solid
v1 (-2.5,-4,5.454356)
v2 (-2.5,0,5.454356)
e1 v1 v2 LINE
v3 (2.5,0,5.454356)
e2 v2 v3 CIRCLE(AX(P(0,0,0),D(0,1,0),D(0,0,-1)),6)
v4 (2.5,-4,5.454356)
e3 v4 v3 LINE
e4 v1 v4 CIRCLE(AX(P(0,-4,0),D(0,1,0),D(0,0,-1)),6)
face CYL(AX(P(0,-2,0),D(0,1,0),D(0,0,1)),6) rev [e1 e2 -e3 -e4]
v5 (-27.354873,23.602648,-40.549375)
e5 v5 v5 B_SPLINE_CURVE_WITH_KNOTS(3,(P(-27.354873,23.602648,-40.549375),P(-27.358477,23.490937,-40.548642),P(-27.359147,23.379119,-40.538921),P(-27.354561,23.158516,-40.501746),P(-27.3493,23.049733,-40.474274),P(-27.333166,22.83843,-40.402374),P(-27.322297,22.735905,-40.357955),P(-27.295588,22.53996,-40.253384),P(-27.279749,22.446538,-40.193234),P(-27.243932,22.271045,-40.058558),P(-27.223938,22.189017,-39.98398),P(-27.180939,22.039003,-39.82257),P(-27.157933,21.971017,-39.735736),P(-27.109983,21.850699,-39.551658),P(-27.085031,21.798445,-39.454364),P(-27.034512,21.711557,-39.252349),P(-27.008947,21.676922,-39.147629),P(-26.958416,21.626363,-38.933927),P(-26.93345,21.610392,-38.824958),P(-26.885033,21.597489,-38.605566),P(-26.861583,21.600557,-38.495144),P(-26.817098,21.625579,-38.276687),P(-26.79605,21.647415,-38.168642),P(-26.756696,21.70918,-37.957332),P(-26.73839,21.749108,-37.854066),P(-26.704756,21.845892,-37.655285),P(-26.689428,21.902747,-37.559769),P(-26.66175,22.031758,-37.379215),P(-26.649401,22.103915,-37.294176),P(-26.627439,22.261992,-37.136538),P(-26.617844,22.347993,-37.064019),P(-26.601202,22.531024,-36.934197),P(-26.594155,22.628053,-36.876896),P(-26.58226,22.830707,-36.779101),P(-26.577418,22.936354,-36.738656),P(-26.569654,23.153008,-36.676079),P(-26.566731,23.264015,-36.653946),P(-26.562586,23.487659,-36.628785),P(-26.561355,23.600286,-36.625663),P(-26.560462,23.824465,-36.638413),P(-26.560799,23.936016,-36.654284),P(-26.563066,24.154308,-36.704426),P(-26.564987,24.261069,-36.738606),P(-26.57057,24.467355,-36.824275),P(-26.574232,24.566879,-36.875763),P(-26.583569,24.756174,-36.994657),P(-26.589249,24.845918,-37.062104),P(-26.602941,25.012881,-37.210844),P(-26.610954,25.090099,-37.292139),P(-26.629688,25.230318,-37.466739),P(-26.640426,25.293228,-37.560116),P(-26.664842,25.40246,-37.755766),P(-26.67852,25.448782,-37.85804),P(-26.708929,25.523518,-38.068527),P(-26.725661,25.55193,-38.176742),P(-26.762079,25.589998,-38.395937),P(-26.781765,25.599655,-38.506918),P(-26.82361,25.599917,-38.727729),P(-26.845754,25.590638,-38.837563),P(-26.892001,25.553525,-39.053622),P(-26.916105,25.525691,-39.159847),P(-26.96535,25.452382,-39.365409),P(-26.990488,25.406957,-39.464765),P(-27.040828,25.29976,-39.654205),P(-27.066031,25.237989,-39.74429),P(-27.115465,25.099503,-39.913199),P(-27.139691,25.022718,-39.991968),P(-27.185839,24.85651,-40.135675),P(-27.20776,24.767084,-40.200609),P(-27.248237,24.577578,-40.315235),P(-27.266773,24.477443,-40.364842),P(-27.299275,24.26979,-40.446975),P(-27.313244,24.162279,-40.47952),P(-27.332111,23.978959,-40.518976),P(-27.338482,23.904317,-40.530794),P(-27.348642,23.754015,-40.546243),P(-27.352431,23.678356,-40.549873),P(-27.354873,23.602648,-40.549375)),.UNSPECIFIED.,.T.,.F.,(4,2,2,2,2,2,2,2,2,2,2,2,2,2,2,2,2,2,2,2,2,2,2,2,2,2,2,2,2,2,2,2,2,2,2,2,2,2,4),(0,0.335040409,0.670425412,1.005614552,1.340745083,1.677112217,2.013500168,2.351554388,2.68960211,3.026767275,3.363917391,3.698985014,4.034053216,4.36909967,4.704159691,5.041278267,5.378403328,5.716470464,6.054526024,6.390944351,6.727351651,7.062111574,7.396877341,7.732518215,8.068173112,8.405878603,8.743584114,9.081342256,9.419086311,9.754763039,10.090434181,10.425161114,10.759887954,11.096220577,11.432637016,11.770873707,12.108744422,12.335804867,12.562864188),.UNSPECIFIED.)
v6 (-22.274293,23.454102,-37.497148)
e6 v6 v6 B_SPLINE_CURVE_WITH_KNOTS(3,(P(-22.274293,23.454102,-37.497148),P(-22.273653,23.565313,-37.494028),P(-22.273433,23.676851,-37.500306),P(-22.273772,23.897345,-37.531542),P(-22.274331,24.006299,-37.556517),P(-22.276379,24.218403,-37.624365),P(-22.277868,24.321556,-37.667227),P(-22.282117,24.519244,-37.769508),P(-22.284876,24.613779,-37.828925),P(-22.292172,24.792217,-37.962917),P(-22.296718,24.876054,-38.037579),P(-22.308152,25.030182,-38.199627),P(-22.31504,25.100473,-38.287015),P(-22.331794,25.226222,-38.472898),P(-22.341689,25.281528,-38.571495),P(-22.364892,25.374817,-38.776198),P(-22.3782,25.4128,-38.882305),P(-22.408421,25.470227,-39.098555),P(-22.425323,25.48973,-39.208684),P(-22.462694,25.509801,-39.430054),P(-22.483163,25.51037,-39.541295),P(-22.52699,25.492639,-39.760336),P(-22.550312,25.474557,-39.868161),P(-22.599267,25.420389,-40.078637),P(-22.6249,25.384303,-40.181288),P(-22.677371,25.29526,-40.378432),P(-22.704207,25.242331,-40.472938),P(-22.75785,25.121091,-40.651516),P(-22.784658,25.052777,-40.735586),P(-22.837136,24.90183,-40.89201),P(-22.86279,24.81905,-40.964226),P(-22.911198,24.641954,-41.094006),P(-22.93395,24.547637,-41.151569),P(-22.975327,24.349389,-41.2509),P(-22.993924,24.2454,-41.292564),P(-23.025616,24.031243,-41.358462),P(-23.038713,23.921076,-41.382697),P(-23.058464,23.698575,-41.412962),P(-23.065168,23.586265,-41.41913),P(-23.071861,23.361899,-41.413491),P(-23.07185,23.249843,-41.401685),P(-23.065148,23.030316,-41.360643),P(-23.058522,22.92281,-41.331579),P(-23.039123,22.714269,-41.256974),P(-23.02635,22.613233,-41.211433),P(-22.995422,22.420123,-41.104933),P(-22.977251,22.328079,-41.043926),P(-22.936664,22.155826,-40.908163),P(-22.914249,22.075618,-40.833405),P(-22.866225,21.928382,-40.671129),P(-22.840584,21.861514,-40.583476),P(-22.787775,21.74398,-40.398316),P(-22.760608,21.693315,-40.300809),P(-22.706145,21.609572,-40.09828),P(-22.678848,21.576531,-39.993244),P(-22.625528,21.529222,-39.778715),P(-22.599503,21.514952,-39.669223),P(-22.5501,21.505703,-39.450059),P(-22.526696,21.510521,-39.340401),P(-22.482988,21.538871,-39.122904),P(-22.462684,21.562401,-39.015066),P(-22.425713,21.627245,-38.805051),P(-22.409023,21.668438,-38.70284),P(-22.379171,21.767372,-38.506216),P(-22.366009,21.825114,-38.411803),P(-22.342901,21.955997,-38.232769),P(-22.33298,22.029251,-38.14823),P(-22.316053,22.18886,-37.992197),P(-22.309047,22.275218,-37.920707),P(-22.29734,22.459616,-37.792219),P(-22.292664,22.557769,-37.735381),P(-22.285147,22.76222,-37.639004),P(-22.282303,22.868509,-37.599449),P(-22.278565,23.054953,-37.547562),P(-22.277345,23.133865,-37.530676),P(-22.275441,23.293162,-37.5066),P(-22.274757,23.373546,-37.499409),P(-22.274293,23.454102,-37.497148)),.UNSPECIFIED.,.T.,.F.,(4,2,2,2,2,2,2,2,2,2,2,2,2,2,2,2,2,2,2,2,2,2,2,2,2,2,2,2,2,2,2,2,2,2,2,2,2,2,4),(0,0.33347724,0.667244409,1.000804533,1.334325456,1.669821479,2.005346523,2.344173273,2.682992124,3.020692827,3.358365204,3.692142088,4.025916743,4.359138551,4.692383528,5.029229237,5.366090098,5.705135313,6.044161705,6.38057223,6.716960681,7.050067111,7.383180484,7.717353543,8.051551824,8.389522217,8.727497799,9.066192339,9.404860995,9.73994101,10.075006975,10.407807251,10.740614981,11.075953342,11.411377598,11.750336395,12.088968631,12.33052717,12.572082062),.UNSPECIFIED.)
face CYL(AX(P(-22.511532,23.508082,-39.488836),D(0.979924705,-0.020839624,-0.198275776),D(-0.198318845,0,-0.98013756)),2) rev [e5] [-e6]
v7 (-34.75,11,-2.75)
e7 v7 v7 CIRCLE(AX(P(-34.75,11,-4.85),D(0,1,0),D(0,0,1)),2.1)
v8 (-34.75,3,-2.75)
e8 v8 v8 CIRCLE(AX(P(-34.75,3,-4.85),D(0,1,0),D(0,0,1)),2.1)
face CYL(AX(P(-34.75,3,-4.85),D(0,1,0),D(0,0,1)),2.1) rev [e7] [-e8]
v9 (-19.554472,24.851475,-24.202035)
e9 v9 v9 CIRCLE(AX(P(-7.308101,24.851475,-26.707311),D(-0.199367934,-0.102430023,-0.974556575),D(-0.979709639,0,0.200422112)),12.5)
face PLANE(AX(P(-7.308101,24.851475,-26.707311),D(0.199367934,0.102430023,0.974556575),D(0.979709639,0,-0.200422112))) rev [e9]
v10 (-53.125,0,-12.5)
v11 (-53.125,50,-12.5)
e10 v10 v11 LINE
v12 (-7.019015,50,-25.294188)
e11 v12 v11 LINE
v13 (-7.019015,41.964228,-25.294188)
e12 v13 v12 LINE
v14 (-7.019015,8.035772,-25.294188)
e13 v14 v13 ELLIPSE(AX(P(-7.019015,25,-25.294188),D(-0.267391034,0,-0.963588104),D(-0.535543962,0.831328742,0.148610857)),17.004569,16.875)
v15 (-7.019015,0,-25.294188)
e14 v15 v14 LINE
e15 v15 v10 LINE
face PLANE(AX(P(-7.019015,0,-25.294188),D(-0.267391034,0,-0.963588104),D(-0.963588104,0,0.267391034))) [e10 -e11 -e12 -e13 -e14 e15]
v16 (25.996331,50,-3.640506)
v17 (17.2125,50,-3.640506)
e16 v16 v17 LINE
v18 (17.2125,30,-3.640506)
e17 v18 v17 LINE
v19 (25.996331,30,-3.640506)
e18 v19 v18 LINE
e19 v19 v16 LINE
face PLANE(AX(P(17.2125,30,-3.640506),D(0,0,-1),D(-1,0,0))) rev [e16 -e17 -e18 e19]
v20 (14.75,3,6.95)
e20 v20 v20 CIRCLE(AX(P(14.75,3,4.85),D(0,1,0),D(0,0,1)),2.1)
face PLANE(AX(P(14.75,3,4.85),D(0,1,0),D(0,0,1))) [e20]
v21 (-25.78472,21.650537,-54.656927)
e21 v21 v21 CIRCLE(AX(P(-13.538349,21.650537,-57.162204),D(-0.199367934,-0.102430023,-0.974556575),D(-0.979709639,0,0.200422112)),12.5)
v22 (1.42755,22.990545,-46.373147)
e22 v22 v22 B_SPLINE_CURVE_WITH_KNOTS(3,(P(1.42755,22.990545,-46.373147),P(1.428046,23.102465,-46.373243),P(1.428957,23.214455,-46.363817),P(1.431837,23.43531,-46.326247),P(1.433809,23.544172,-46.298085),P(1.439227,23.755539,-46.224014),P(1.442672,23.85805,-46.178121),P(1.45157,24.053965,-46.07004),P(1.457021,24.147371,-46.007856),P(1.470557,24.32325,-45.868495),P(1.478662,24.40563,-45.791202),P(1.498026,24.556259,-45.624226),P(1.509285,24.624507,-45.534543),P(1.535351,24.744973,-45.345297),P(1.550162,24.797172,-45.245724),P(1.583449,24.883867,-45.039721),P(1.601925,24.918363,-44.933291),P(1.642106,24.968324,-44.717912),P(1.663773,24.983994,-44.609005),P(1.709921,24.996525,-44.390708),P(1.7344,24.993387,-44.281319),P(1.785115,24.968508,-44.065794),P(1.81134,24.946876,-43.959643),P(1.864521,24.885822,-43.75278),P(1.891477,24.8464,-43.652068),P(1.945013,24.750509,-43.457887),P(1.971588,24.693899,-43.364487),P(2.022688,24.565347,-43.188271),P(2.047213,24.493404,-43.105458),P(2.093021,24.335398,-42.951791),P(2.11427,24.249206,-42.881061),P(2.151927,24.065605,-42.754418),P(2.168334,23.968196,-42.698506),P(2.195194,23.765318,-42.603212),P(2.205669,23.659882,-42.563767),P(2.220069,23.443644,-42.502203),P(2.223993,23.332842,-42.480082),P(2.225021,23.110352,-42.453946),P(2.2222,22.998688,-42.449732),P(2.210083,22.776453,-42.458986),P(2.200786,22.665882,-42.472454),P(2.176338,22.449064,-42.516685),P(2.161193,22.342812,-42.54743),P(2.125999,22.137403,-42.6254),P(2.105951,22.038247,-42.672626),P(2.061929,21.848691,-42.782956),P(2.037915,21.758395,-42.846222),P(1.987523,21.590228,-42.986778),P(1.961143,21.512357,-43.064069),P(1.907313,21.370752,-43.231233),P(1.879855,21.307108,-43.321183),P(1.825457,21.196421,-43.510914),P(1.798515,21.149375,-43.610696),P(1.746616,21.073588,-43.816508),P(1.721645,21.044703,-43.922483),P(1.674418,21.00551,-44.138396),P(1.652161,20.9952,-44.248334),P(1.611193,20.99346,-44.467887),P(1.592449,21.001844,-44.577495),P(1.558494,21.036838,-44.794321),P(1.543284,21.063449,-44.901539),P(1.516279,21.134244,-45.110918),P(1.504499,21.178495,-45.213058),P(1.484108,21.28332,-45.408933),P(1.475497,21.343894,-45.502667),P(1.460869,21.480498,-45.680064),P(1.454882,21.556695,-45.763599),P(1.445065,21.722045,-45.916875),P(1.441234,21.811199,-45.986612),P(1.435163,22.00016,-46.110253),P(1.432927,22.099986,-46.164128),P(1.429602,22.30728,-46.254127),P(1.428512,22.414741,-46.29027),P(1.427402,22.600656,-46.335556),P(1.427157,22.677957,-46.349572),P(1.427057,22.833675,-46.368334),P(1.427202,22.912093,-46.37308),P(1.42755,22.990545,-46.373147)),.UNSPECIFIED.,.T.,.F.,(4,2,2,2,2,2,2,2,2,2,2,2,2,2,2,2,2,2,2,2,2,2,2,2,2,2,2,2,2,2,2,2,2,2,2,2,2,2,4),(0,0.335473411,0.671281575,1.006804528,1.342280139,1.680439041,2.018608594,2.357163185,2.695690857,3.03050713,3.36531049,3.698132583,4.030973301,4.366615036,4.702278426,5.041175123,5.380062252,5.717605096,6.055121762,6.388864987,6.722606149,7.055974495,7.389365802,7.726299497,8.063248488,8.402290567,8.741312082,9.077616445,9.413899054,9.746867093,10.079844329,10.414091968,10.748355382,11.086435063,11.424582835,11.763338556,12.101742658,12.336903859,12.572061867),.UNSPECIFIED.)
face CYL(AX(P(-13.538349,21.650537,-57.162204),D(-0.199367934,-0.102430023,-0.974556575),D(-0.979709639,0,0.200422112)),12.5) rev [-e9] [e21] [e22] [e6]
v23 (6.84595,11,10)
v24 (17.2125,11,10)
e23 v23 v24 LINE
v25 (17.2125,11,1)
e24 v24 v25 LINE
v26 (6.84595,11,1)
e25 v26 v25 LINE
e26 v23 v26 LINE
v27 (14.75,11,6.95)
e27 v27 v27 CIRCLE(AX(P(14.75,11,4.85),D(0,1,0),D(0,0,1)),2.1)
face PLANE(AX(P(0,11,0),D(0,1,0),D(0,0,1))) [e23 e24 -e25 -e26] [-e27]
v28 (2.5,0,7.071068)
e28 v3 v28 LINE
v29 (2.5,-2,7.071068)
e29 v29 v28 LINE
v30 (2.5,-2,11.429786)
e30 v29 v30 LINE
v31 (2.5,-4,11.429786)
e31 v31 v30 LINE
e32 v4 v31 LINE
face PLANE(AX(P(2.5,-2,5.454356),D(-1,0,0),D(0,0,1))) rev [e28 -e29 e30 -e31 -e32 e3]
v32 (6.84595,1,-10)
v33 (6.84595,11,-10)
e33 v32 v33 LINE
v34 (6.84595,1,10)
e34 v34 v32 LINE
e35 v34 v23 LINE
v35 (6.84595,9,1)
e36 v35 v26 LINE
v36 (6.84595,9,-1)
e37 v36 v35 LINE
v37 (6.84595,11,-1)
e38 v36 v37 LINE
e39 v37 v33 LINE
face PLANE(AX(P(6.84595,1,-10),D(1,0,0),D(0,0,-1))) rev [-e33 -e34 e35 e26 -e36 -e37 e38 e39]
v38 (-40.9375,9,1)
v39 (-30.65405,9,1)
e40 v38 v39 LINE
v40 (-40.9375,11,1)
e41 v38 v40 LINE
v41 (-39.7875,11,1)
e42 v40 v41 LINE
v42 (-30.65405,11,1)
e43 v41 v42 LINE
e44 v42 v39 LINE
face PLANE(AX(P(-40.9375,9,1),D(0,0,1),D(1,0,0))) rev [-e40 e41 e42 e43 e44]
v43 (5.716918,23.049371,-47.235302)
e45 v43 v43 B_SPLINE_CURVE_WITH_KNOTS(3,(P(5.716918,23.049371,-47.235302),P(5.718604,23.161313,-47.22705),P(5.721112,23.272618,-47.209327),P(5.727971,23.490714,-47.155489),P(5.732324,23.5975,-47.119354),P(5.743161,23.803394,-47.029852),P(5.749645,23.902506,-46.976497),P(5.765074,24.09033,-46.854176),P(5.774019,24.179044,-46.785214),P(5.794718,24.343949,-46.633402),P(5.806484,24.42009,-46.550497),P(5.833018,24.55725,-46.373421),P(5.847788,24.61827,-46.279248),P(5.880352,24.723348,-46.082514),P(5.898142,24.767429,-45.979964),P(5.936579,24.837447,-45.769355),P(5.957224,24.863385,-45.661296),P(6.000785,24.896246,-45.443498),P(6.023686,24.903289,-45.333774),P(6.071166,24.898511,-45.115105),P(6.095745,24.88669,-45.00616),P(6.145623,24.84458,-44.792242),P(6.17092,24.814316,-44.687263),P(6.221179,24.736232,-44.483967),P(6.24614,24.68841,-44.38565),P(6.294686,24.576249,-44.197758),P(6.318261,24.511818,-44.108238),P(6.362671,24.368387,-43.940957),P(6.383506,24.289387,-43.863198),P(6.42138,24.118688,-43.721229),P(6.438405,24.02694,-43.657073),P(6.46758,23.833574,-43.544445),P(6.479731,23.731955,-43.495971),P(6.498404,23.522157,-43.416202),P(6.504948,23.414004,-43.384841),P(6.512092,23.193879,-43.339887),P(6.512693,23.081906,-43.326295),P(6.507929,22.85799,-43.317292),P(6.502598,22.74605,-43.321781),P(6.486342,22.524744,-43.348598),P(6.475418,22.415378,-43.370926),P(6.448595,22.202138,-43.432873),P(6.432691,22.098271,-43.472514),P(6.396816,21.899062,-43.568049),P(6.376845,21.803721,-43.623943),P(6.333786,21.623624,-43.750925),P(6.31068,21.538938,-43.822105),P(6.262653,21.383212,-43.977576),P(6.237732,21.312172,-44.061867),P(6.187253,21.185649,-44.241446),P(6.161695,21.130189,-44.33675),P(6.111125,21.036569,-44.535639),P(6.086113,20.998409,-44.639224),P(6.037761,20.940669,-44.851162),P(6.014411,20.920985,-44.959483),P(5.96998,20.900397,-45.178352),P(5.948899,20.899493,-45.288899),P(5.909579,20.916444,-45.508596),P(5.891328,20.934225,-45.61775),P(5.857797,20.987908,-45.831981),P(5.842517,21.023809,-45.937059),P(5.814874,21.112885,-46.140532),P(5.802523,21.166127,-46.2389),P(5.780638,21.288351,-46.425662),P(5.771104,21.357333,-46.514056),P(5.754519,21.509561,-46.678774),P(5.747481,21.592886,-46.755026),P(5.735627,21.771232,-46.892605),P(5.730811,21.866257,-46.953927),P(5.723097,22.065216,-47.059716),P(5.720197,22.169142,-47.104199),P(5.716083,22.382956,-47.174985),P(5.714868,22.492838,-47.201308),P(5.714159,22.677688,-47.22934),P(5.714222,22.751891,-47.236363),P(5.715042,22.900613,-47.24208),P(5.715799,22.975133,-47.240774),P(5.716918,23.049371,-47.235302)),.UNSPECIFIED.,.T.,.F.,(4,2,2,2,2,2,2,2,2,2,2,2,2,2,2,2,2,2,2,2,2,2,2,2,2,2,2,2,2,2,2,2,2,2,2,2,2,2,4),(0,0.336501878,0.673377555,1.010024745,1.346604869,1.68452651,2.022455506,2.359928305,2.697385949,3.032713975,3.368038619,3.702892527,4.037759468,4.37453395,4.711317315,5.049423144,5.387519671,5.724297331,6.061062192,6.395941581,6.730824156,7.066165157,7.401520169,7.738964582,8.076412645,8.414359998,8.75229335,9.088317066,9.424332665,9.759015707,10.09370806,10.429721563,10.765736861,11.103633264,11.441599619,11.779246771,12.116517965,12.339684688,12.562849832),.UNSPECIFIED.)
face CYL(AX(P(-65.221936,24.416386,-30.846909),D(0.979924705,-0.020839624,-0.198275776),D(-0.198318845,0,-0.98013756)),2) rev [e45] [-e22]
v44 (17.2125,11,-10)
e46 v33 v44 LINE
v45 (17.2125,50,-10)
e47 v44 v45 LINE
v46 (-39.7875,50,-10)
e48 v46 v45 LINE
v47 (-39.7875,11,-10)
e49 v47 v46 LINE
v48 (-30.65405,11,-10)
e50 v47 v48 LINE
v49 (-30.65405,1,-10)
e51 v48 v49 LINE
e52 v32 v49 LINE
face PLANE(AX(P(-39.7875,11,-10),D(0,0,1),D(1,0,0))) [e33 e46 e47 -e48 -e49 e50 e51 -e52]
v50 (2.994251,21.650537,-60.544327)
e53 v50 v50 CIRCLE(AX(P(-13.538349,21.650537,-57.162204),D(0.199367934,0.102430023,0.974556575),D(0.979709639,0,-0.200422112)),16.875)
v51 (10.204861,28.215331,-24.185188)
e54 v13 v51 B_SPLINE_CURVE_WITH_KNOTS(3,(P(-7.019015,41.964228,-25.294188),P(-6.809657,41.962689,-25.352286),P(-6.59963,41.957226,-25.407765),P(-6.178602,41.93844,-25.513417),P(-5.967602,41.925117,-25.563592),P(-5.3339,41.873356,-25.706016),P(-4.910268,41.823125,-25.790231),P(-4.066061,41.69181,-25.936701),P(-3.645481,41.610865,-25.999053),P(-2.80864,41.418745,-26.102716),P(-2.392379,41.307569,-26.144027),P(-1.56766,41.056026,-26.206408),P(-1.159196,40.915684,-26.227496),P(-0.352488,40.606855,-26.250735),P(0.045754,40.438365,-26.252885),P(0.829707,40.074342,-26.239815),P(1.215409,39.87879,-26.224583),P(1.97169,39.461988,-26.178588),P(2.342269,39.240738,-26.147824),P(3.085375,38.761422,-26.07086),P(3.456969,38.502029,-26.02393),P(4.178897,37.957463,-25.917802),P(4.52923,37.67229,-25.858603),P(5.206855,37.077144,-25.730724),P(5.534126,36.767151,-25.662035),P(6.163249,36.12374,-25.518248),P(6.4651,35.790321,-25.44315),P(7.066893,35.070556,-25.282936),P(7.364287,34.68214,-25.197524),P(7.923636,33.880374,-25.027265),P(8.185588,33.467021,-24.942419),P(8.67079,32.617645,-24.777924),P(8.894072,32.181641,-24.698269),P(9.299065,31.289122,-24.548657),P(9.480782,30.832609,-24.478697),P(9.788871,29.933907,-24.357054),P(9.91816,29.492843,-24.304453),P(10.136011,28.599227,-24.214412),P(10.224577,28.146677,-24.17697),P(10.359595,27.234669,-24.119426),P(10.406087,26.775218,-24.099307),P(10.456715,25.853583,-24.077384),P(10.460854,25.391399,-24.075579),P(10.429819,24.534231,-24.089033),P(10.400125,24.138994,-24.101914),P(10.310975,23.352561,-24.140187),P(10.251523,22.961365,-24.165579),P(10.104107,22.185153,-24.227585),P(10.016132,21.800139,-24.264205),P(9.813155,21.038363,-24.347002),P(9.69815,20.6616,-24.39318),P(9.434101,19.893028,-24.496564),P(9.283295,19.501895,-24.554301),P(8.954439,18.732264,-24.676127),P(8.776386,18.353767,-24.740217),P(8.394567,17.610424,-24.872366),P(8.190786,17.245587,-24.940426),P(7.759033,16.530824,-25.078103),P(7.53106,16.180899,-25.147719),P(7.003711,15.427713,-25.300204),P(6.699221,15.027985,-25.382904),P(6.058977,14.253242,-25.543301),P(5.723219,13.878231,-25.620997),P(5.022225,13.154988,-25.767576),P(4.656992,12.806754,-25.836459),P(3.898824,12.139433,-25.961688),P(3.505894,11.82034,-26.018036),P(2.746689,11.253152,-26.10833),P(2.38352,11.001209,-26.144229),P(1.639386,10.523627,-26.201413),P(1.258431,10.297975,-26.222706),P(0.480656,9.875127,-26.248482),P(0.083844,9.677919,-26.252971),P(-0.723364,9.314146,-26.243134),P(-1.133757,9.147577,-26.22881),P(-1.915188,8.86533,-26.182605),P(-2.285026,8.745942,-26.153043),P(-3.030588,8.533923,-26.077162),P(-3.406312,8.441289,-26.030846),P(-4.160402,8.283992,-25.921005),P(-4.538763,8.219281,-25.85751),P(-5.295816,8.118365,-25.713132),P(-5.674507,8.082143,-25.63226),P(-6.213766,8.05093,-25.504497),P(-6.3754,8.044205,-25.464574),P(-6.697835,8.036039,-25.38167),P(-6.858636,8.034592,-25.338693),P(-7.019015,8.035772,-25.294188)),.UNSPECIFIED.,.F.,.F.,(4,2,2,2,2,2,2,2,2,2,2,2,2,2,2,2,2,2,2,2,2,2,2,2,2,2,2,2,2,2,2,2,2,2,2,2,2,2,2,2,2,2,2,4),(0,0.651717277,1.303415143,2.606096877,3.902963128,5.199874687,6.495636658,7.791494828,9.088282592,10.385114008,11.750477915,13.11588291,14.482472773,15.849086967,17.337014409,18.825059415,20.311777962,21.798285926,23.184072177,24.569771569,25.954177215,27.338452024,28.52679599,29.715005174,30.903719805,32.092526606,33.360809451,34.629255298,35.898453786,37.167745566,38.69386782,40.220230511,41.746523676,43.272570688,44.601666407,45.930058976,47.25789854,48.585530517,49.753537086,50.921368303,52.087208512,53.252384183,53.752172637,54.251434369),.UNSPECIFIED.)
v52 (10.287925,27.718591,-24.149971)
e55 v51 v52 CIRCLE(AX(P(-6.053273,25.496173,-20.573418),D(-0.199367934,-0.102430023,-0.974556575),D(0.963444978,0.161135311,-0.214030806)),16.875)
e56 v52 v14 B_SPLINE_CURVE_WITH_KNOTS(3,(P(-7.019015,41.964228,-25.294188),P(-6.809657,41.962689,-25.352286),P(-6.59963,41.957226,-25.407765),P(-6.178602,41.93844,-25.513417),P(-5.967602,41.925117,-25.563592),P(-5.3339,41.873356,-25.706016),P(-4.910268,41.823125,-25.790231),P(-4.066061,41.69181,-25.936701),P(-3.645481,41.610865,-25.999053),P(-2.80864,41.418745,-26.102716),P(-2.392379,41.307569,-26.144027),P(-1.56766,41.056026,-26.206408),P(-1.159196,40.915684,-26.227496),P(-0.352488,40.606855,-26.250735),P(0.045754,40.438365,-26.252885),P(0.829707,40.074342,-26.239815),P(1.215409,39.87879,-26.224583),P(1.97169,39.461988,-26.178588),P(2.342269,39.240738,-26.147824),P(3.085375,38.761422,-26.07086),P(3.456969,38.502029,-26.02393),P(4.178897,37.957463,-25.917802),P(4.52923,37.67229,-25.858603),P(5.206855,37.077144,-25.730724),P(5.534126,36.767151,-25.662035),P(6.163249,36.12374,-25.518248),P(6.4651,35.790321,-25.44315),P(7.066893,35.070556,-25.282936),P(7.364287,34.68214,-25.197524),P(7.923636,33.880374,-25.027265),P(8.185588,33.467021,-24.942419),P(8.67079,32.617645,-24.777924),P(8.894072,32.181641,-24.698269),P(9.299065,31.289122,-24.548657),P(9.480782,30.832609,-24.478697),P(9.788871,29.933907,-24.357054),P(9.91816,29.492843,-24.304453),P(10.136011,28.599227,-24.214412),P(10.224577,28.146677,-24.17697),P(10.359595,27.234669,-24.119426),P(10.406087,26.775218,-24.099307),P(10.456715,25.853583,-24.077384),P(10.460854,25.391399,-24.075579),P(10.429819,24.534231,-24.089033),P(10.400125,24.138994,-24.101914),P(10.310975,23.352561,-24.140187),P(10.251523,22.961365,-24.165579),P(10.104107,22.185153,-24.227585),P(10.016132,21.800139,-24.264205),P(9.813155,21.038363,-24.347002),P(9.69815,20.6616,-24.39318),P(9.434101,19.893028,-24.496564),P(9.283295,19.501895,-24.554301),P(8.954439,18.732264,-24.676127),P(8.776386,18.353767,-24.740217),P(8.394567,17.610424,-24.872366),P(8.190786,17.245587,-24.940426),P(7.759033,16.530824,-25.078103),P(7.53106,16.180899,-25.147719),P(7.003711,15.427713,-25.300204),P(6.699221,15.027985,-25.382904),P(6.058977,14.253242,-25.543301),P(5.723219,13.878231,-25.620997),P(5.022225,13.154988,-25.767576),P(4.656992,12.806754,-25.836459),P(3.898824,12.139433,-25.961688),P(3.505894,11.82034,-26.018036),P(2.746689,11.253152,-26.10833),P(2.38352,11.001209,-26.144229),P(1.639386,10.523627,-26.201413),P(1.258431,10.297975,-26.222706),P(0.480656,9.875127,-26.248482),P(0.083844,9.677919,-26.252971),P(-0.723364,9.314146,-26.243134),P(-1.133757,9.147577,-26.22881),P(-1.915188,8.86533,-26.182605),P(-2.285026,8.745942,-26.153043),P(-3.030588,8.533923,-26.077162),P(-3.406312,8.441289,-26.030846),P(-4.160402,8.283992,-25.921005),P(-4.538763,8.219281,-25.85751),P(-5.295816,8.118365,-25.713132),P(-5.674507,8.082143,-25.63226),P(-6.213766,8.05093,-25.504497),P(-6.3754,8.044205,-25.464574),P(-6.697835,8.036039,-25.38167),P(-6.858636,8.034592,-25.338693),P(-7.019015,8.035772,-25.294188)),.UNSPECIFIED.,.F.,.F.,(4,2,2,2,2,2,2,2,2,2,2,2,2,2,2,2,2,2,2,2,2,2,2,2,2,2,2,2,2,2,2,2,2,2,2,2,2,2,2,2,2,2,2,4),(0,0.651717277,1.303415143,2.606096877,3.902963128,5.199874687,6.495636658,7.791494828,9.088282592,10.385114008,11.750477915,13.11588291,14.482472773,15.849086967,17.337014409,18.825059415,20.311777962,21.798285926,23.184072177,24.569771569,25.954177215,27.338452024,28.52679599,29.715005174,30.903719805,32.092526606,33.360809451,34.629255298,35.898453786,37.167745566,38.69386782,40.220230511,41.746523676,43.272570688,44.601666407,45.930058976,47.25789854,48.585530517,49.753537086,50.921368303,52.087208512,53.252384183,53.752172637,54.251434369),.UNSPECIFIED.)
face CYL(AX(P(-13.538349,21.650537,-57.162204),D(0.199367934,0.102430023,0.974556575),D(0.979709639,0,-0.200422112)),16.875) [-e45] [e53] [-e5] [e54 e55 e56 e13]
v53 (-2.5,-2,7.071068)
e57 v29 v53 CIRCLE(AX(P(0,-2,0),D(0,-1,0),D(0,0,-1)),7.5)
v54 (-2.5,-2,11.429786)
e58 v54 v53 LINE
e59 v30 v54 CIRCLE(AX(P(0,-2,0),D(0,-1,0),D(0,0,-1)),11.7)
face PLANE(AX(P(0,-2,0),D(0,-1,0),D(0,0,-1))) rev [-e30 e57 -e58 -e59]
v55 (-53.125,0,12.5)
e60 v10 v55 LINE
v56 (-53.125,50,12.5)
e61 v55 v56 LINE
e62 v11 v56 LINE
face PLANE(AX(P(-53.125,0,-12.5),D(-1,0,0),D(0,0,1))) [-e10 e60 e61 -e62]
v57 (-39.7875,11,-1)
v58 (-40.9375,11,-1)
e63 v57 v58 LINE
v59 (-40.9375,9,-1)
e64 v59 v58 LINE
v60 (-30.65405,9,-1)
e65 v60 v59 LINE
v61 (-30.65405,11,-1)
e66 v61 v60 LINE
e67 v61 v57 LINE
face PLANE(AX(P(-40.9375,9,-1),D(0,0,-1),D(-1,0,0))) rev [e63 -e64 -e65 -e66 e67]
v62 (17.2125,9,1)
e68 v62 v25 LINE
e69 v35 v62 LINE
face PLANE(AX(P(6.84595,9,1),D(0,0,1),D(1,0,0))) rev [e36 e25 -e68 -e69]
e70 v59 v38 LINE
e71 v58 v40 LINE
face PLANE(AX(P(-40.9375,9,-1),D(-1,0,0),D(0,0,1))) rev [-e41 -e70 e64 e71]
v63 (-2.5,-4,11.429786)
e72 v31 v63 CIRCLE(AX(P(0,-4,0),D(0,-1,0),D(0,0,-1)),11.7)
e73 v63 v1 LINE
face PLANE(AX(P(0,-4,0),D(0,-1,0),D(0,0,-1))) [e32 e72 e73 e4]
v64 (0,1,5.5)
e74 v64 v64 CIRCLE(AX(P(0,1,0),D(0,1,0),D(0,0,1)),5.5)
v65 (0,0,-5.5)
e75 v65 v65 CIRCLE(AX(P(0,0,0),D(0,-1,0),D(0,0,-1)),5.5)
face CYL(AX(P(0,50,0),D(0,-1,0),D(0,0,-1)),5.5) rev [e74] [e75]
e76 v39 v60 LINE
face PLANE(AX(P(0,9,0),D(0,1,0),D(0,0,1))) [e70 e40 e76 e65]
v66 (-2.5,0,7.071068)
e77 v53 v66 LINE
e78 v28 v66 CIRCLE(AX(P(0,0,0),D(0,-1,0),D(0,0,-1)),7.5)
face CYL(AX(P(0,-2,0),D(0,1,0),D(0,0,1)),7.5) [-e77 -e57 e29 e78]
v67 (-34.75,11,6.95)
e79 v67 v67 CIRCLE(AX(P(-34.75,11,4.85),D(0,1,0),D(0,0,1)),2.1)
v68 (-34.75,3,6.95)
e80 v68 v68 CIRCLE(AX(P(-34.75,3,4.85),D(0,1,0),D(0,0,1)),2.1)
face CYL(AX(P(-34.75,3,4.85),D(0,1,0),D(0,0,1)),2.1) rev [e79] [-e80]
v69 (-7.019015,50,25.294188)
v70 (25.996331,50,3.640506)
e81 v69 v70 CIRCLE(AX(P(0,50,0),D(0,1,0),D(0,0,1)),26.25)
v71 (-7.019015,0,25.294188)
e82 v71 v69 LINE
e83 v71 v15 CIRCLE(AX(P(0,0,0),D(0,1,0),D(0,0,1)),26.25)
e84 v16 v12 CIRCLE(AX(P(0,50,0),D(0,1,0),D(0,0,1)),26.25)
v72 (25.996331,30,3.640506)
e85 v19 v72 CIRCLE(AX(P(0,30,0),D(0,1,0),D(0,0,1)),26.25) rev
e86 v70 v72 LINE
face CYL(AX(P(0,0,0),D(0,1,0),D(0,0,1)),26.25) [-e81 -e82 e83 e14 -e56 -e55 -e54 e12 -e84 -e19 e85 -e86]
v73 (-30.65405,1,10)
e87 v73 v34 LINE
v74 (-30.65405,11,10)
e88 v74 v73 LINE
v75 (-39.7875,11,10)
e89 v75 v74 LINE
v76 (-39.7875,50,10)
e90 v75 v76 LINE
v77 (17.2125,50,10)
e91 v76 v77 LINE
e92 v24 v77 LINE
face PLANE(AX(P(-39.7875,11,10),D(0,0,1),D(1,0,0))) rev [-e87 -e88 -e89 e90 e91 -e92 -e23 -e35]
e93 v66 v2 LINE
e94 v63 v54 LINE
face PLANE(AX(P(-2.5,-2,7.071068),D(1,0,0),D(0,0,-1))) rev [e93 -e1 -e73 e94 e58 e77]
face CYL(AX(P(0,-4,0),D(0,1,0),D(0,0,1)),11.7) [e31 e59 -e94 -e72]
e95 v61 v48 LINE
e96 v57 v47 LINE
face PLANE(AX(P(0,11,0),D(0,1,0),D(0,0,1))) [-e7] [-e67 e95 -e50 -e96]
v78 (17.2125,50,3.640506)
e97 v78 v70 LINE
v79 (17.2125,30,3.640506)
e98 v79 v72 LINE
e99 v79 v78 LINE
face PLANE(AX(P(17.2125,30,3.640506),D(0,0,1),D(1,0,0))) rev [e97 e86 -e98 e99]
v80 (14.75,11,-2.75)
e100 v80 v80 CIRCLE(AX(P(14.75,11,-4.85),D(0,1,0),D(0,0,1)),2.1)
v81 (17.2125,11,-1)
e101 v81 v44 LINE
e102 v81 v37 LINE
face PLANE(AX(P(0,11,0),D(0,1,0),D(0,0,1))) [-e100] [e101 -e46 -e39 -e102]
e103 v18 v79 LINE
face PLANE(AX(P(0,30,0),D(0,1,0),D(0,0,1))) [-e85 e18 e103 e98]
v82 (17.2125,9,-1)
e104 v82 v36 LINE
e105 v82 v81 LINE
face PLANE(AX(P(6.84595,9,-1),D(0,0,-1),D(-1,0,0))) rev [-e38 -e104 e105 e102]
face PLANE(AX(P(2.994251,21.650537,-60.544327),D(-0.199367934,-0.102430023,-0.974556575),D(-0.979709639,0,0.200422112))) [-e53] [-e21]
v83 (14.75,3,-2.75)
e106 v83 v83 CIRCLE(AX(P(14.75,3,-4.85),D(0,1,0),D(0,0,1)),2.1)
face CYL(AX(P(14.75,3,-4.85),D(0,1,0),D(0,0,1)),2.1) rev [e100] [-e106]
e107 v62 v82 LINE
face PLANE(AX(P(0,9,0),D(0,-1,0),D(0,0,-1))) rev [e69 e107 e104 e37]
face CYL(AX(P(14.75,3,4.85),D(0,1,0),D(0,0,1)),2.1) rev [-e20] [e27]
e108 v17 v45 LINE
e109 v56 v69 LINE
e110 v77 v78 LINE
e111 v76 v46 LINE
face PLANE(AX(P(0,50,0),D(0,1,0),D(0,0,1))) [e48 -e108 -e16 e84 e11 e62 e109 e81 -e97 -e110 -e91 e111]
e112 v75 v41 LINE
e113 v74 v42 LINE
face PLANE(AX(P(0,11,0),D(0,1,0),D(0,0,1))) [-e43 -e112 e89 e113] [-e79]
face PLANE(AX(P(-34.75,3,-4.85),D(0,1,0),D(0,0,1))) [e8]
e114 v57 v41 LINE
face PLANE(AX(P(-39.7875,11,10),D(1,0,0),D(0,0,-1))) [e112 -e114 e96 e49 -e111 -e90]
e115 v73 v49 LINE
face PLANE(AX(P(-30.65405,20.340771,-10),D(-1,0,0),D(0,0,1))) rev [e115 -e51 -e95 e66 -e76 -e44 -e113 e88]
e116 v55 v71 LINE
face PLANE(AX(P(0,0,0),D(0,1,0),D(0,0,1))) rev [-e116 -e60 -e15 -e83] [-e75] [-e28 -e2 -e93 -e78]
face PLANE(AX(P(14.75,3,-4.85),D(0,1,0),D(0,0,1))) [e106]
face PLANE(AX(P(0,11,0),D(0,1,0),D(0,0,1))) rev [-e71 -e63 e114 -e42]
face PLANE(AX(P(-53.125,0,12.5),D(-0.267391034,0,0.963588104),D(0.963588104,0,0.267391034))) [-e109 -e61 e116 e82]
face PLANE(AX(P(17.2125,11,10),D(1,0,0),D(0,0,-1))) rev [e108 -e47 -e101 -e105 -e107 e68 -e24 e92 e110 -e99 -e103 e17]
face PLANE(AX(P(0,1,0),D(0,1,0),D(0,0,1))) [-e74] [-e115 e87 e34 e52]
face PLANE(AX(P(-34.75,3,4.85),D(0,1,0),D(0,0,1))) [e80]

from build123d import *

# Parameters (mm, degrees)
BOSS_EXTRUDE1_DEPTH       = 40
REVOLVE1_START            = -44.95139953
REVOLVE1_OUTLINE_R        = 13.5
REVOLVE1_DEPTH            = 30.829897511
M18_CLEARANCE_HOLE1_D     = 20
M18_CLEARANCE_HOLE1_DEPTH = 25
SKETCH9_W                 = 1.6
SKETCH9_H                 = 27
CUT_EXTRUDE4_DEPTH        = 76.299241718
CUT_EXTRUDE4_DEPTH_BACK   = 76.299241718
SKETCH18_R                = 1.6
SCALE2_SCALE              = 1.25
SKETCH19_W                = 57
SKETCH19_H                = 20
CUT_EXTRUDE5_DEPTH        = 39
SKETCH20_W                = 40
SKETCH20_H                = 20
CUT_EXTRUDE6_DEPTH        = 10
SKETCH21_R                = 5.5
CUT_EXTRUDE7_DEPTH        = 96.0605556
SKETCH22_W                = 7.783449774
SKETCH22_H                = 2
SKETCH22_W_2              = 10.366550226
CUT_EXTRUDE8_DEPTH        = 2
SKETCH23_W                = 9.71853625
SKETCH23_H                = 7.281011564
CUT_EXTRUDE9_DEPTH        = 20
SKETCH25_W                = 2.5
SKETCH25_H                = 9
BOSS_EXTRUDE3_DEPTH       = 10
SKETCH26_W                = 2.5
SKETCH26_H                = 2
BOSS_EXTRUDE4_DEPTH       = 8
SKETCH27_R                = 2.1
CUT_EXTRUDE10_DEPTH       = 8
BOSS_EXTRUDE5_DEPTH       = 2
BOSS_EXTRUDE6_DEPTH       = 2


with BuildPart() as part:
    # Sketch1 → Boss-Extrude1 (new body)
    with BuildSketch(Plane(origin=(0, 40, 0), x_dir=(1, 0, 0), z_dir=(0, 1, 0))):
        with BuildLine():
            Line((-5.61521172, 20.235350191), (-42.5, 10))
            Line((-42.5, 10), (-42.5, -10))
            Line((-42.5, -10), (-5.61521172, -20.235350191))
            ThreePointArc((-5.61521172, -20.235350191), (21, 0), (-5.61521172, 20.235350191))
        make_face()
    extrude(amount=-BOSS_EXTRUDE1_DEPTH)

    # Revolve1: read off the stored shape, not the designer's step
    # Revolve1 outline → Revolve1 (add)
    with BuildSketch(Plane(origin=(0, 0, 0), x_dir=(0.9799247046208294, -0.02083962380947531, -0.19827577601224947), z_dir=(0.19936793441719802, 0.10243002349202102, 0.9745565745577031)).offset(REVOLVE1_START)):
        with Locations((-1.9070974, 22.005607966)):
            Circle(REVOLVE1_OUTLINE_R)
    extrude(amount=REVOLVE1_DEPTH)

    # M18 Clearance Hole1
    with Locations(Plane(origin=(-8.961867673, -4.60437291, -43.807681948), x_dir=(-0.9799247046208296, 0.02083962380947534, 0.19827577601224922), z_dir=(-0.19936793441719777, -0.10243002349202121, -0.9745565745577032))):
        with Locations((1.9070974, 22.005607966)):
            Hole(M18_CLEARANCE_HOLE1_D / 2, depth=M18_CLEARANCE_HOLE1_DEPTH)

    # Sketch9 → M3.5 Clearance Hole1 (revolve, cut)
    with BuildSketch(Plane(origin=(-18.009225855, 18.806465846, -31.591069121), x_dir=(-0.12392681772022805, 0.7153744254872676, -0.6876638533531477), z_dir=(0.1561720753640579, 0.6984304843277114, 0.6984304843277114))):
        with Locations((0.8, 13.5)):
            Rectangle(SKETCH9_W, SKETCH9_H)
    revolve(axis=Axis((-11.78670398, 18.674134235, -32.850120299), (-0.9799247046208297, 0.020839623809475325, 0.19827577601224802)), mode=Mode.SUBTRACT)

    # Sketch18 → Cut-Extrude4 (cut, two sides: drawn at the far end of the back side and taken through both)
    with BuildSketch(Plane(origin=(-1.740210315, 0.03700828, 0.352110268), x_dir=(-0.19823095447813932, 0.004215689735382395, -0.9801462730872066), z_dir=(0.9799247046208297, -0.020839623809475356, -0.19827577601224802)).offset(-CUT_EXTRUDE4_DEPTH_BACK)):
        with Locations(Location((34.613136918, 18.419306886, 0), (0, 0, 359.758405588))):
            Circle(SKETCH18_R)
    extrude(amount=CUT_EXTRUDE4_DEPTH + CUT_EXTRUDE4_DEPTH_BACK, mode=Mode.SUBTRACT)


with BuildPart() as part_1:
    # Scale2: scaled about (0, 0, 0)
    add(part.part.scale(SCALE2_SCALE))

    # Sketch19 → Cut-Extrude5 (cut)
    with BuildSketch(Plane(origin=(0, 50, 0), x_dir=(1, 0, 0), z_dir=(0, 1, 0))):
        with Locations((-11.2875, 0)):
            Rectangle(SKETCH19_W, SKETCH19_H)
    extrude(amount=-CUT_EXTRUDE5_DEPTH, mode=Mode.SUBTRACT)

    # Sketch20 → Cut-Extrude6 (cut)
    with BuildSketch(Plane(origin=(0, 11, 0), x_dir=(1, 0, 0), z_dir=(0, 1, 0))):
        with Locations((-13.154050226, 0)):
            Rectangle(SKETCH20_W, SKETCH20_H)
    extrude(amount=-CUT_EXTRUDE6_DEPTH, mode=Mode.SUBTRACT)

    # Sketch21 → Cut-Extrude7 (cut, through all)
    with BuildSketch(Plane.XZ):
        with Locations(Location((0, 0, 0), (0, 0, 270))):
            Circle(SKETCH21_R)
    extrude(amount=-CUT_EXTRUDE7_DEPTH, mode=Mode.SUBTRACT)

    # Sketch22 → Cut-Extrude8 (cut)
    with BuildSketch(Plane(origin=(0, 11, 0), x_dir=(1, 0, 0), z_dir=(0, 1, 0))):
        with Locations((-37.045775113, 0)):
            Rectangle(SKETCH22_W, SKETCH22_H)
        with Locations((12.029224887, 0)):
            Rectangle(SKETCH22_W_2, SKETCH22_H)
    extrude(amount=-CUT_EXTRUDE8_DEPTH, mode=Mode.SUBTRACT)

    # Sketch23 → Cut-Extrude9 (cut)
    with BuildSketch(Plane(origin=(0, 50, 0), x_dir=(1, 0, 0), z_dir=(0, 1, 0))):
        with Locations((22.071768125, 0)):
            Rectangle(SKETCH23_W, SKETCH23_H)
    extrude(amount=-CUT_EXTRUDE9_DEPTH, mode=Mode.SUBTRACT)

    # Sketch25 → Boss-Extrude3 (add)
    with BuildSketch(Plane(origin=(0, 1, 0), x_dir=(1, 0, 0), z_dir=(0, 1, 0))):
        with Locations((-31.904050226, 5.5)):
            Rectangle(SKETCH25_W, SKETCH25_H)
        with Locations((-31.904050226, -5.5)):
            Rectangle(SKETCH25_W, SKETCH25_H)
    extrude(amount=BOSS_EXTRUDE3_DEPTH)

    # Sketch26 → Boss-Extrude4 (add)
    with BuildSketch(Plane(origin=(0, 1, 0), x_dir=(1, 0, 0), z_dir=(0, 1, 0))):
        with Locations((-31.904050226, 0)):
            Rectangle(SKETCH26_W, SKETCH26_H)
    extrude(amount=BOSS_EXTRUDE4_DEPTH)

    # Sketch27 → Cut-Extrude10 (cut)
    with BuildSketch(Plane(origin=(0, 11, 0), x_dir=(1, 0, 0), z_dir=(0, 1, 0))):
        with Locations(Location((14.75, 4.85, 0), (0, 0, 270))):
            Circle(SKETCH27_R)
        with Locations(Location((14.75, -4.85, 0), (0, 0, 270))):
            Circle(SKETCH27_R)
        with Locations(Location((-34.75, 4.85, 0), (0, 0, 270))):
            Circle(SKETCH27_R)
        with Locations(Location((-34.75, -4.85, 0), (0, 0, 270))):
            Circle(SKETCH27_R)
    extrude(amount=-CUT_EXTRUDE10_DEPTH, mode=Mode.SUBTRACT)

    # Sketch35 → Boss-Extrude5 (add)
    with BuildSketch(Plane.XZ):
        with BuildLine():
            Line((-2.5, 7.071067812), (-2.5, 5.454356057))
            ThreePointArc((-2.5, 5.454356057), (0, 6), (2.5, 5.454356057))
            Line((2.5, 5.454356057), (2.5, 7.071067812))
            ThreePointArc((2.5, 7.071067812), (0, 7.5), (-2.5, 7.071067812))
        make_face()
    extrude(amount=BOSS_EXTRUDE5_DEPTH)

    # Sketch36 → Boss-Extrude6 (add)
    with BuildSketch(Plane.XZ.offset(2)):
        with BuildLine():
            Line((-2.5, 5.454356057), (-2.5, 11.42978565))
            ThreePointArc((-2.5, 11.42978565), (0, 11.7), (2.5, 11.42978565))
            Line((2.5, 11.42978565), (2.5, 5.454356057))
            ThreePointArc((2.5, 5.454356057), (0, 6), (-2.5, 5.454356057))
        make_face()
    extrude(amount=BOSS_EXTRUDE6_DEPTH)


solid = part_1.part
